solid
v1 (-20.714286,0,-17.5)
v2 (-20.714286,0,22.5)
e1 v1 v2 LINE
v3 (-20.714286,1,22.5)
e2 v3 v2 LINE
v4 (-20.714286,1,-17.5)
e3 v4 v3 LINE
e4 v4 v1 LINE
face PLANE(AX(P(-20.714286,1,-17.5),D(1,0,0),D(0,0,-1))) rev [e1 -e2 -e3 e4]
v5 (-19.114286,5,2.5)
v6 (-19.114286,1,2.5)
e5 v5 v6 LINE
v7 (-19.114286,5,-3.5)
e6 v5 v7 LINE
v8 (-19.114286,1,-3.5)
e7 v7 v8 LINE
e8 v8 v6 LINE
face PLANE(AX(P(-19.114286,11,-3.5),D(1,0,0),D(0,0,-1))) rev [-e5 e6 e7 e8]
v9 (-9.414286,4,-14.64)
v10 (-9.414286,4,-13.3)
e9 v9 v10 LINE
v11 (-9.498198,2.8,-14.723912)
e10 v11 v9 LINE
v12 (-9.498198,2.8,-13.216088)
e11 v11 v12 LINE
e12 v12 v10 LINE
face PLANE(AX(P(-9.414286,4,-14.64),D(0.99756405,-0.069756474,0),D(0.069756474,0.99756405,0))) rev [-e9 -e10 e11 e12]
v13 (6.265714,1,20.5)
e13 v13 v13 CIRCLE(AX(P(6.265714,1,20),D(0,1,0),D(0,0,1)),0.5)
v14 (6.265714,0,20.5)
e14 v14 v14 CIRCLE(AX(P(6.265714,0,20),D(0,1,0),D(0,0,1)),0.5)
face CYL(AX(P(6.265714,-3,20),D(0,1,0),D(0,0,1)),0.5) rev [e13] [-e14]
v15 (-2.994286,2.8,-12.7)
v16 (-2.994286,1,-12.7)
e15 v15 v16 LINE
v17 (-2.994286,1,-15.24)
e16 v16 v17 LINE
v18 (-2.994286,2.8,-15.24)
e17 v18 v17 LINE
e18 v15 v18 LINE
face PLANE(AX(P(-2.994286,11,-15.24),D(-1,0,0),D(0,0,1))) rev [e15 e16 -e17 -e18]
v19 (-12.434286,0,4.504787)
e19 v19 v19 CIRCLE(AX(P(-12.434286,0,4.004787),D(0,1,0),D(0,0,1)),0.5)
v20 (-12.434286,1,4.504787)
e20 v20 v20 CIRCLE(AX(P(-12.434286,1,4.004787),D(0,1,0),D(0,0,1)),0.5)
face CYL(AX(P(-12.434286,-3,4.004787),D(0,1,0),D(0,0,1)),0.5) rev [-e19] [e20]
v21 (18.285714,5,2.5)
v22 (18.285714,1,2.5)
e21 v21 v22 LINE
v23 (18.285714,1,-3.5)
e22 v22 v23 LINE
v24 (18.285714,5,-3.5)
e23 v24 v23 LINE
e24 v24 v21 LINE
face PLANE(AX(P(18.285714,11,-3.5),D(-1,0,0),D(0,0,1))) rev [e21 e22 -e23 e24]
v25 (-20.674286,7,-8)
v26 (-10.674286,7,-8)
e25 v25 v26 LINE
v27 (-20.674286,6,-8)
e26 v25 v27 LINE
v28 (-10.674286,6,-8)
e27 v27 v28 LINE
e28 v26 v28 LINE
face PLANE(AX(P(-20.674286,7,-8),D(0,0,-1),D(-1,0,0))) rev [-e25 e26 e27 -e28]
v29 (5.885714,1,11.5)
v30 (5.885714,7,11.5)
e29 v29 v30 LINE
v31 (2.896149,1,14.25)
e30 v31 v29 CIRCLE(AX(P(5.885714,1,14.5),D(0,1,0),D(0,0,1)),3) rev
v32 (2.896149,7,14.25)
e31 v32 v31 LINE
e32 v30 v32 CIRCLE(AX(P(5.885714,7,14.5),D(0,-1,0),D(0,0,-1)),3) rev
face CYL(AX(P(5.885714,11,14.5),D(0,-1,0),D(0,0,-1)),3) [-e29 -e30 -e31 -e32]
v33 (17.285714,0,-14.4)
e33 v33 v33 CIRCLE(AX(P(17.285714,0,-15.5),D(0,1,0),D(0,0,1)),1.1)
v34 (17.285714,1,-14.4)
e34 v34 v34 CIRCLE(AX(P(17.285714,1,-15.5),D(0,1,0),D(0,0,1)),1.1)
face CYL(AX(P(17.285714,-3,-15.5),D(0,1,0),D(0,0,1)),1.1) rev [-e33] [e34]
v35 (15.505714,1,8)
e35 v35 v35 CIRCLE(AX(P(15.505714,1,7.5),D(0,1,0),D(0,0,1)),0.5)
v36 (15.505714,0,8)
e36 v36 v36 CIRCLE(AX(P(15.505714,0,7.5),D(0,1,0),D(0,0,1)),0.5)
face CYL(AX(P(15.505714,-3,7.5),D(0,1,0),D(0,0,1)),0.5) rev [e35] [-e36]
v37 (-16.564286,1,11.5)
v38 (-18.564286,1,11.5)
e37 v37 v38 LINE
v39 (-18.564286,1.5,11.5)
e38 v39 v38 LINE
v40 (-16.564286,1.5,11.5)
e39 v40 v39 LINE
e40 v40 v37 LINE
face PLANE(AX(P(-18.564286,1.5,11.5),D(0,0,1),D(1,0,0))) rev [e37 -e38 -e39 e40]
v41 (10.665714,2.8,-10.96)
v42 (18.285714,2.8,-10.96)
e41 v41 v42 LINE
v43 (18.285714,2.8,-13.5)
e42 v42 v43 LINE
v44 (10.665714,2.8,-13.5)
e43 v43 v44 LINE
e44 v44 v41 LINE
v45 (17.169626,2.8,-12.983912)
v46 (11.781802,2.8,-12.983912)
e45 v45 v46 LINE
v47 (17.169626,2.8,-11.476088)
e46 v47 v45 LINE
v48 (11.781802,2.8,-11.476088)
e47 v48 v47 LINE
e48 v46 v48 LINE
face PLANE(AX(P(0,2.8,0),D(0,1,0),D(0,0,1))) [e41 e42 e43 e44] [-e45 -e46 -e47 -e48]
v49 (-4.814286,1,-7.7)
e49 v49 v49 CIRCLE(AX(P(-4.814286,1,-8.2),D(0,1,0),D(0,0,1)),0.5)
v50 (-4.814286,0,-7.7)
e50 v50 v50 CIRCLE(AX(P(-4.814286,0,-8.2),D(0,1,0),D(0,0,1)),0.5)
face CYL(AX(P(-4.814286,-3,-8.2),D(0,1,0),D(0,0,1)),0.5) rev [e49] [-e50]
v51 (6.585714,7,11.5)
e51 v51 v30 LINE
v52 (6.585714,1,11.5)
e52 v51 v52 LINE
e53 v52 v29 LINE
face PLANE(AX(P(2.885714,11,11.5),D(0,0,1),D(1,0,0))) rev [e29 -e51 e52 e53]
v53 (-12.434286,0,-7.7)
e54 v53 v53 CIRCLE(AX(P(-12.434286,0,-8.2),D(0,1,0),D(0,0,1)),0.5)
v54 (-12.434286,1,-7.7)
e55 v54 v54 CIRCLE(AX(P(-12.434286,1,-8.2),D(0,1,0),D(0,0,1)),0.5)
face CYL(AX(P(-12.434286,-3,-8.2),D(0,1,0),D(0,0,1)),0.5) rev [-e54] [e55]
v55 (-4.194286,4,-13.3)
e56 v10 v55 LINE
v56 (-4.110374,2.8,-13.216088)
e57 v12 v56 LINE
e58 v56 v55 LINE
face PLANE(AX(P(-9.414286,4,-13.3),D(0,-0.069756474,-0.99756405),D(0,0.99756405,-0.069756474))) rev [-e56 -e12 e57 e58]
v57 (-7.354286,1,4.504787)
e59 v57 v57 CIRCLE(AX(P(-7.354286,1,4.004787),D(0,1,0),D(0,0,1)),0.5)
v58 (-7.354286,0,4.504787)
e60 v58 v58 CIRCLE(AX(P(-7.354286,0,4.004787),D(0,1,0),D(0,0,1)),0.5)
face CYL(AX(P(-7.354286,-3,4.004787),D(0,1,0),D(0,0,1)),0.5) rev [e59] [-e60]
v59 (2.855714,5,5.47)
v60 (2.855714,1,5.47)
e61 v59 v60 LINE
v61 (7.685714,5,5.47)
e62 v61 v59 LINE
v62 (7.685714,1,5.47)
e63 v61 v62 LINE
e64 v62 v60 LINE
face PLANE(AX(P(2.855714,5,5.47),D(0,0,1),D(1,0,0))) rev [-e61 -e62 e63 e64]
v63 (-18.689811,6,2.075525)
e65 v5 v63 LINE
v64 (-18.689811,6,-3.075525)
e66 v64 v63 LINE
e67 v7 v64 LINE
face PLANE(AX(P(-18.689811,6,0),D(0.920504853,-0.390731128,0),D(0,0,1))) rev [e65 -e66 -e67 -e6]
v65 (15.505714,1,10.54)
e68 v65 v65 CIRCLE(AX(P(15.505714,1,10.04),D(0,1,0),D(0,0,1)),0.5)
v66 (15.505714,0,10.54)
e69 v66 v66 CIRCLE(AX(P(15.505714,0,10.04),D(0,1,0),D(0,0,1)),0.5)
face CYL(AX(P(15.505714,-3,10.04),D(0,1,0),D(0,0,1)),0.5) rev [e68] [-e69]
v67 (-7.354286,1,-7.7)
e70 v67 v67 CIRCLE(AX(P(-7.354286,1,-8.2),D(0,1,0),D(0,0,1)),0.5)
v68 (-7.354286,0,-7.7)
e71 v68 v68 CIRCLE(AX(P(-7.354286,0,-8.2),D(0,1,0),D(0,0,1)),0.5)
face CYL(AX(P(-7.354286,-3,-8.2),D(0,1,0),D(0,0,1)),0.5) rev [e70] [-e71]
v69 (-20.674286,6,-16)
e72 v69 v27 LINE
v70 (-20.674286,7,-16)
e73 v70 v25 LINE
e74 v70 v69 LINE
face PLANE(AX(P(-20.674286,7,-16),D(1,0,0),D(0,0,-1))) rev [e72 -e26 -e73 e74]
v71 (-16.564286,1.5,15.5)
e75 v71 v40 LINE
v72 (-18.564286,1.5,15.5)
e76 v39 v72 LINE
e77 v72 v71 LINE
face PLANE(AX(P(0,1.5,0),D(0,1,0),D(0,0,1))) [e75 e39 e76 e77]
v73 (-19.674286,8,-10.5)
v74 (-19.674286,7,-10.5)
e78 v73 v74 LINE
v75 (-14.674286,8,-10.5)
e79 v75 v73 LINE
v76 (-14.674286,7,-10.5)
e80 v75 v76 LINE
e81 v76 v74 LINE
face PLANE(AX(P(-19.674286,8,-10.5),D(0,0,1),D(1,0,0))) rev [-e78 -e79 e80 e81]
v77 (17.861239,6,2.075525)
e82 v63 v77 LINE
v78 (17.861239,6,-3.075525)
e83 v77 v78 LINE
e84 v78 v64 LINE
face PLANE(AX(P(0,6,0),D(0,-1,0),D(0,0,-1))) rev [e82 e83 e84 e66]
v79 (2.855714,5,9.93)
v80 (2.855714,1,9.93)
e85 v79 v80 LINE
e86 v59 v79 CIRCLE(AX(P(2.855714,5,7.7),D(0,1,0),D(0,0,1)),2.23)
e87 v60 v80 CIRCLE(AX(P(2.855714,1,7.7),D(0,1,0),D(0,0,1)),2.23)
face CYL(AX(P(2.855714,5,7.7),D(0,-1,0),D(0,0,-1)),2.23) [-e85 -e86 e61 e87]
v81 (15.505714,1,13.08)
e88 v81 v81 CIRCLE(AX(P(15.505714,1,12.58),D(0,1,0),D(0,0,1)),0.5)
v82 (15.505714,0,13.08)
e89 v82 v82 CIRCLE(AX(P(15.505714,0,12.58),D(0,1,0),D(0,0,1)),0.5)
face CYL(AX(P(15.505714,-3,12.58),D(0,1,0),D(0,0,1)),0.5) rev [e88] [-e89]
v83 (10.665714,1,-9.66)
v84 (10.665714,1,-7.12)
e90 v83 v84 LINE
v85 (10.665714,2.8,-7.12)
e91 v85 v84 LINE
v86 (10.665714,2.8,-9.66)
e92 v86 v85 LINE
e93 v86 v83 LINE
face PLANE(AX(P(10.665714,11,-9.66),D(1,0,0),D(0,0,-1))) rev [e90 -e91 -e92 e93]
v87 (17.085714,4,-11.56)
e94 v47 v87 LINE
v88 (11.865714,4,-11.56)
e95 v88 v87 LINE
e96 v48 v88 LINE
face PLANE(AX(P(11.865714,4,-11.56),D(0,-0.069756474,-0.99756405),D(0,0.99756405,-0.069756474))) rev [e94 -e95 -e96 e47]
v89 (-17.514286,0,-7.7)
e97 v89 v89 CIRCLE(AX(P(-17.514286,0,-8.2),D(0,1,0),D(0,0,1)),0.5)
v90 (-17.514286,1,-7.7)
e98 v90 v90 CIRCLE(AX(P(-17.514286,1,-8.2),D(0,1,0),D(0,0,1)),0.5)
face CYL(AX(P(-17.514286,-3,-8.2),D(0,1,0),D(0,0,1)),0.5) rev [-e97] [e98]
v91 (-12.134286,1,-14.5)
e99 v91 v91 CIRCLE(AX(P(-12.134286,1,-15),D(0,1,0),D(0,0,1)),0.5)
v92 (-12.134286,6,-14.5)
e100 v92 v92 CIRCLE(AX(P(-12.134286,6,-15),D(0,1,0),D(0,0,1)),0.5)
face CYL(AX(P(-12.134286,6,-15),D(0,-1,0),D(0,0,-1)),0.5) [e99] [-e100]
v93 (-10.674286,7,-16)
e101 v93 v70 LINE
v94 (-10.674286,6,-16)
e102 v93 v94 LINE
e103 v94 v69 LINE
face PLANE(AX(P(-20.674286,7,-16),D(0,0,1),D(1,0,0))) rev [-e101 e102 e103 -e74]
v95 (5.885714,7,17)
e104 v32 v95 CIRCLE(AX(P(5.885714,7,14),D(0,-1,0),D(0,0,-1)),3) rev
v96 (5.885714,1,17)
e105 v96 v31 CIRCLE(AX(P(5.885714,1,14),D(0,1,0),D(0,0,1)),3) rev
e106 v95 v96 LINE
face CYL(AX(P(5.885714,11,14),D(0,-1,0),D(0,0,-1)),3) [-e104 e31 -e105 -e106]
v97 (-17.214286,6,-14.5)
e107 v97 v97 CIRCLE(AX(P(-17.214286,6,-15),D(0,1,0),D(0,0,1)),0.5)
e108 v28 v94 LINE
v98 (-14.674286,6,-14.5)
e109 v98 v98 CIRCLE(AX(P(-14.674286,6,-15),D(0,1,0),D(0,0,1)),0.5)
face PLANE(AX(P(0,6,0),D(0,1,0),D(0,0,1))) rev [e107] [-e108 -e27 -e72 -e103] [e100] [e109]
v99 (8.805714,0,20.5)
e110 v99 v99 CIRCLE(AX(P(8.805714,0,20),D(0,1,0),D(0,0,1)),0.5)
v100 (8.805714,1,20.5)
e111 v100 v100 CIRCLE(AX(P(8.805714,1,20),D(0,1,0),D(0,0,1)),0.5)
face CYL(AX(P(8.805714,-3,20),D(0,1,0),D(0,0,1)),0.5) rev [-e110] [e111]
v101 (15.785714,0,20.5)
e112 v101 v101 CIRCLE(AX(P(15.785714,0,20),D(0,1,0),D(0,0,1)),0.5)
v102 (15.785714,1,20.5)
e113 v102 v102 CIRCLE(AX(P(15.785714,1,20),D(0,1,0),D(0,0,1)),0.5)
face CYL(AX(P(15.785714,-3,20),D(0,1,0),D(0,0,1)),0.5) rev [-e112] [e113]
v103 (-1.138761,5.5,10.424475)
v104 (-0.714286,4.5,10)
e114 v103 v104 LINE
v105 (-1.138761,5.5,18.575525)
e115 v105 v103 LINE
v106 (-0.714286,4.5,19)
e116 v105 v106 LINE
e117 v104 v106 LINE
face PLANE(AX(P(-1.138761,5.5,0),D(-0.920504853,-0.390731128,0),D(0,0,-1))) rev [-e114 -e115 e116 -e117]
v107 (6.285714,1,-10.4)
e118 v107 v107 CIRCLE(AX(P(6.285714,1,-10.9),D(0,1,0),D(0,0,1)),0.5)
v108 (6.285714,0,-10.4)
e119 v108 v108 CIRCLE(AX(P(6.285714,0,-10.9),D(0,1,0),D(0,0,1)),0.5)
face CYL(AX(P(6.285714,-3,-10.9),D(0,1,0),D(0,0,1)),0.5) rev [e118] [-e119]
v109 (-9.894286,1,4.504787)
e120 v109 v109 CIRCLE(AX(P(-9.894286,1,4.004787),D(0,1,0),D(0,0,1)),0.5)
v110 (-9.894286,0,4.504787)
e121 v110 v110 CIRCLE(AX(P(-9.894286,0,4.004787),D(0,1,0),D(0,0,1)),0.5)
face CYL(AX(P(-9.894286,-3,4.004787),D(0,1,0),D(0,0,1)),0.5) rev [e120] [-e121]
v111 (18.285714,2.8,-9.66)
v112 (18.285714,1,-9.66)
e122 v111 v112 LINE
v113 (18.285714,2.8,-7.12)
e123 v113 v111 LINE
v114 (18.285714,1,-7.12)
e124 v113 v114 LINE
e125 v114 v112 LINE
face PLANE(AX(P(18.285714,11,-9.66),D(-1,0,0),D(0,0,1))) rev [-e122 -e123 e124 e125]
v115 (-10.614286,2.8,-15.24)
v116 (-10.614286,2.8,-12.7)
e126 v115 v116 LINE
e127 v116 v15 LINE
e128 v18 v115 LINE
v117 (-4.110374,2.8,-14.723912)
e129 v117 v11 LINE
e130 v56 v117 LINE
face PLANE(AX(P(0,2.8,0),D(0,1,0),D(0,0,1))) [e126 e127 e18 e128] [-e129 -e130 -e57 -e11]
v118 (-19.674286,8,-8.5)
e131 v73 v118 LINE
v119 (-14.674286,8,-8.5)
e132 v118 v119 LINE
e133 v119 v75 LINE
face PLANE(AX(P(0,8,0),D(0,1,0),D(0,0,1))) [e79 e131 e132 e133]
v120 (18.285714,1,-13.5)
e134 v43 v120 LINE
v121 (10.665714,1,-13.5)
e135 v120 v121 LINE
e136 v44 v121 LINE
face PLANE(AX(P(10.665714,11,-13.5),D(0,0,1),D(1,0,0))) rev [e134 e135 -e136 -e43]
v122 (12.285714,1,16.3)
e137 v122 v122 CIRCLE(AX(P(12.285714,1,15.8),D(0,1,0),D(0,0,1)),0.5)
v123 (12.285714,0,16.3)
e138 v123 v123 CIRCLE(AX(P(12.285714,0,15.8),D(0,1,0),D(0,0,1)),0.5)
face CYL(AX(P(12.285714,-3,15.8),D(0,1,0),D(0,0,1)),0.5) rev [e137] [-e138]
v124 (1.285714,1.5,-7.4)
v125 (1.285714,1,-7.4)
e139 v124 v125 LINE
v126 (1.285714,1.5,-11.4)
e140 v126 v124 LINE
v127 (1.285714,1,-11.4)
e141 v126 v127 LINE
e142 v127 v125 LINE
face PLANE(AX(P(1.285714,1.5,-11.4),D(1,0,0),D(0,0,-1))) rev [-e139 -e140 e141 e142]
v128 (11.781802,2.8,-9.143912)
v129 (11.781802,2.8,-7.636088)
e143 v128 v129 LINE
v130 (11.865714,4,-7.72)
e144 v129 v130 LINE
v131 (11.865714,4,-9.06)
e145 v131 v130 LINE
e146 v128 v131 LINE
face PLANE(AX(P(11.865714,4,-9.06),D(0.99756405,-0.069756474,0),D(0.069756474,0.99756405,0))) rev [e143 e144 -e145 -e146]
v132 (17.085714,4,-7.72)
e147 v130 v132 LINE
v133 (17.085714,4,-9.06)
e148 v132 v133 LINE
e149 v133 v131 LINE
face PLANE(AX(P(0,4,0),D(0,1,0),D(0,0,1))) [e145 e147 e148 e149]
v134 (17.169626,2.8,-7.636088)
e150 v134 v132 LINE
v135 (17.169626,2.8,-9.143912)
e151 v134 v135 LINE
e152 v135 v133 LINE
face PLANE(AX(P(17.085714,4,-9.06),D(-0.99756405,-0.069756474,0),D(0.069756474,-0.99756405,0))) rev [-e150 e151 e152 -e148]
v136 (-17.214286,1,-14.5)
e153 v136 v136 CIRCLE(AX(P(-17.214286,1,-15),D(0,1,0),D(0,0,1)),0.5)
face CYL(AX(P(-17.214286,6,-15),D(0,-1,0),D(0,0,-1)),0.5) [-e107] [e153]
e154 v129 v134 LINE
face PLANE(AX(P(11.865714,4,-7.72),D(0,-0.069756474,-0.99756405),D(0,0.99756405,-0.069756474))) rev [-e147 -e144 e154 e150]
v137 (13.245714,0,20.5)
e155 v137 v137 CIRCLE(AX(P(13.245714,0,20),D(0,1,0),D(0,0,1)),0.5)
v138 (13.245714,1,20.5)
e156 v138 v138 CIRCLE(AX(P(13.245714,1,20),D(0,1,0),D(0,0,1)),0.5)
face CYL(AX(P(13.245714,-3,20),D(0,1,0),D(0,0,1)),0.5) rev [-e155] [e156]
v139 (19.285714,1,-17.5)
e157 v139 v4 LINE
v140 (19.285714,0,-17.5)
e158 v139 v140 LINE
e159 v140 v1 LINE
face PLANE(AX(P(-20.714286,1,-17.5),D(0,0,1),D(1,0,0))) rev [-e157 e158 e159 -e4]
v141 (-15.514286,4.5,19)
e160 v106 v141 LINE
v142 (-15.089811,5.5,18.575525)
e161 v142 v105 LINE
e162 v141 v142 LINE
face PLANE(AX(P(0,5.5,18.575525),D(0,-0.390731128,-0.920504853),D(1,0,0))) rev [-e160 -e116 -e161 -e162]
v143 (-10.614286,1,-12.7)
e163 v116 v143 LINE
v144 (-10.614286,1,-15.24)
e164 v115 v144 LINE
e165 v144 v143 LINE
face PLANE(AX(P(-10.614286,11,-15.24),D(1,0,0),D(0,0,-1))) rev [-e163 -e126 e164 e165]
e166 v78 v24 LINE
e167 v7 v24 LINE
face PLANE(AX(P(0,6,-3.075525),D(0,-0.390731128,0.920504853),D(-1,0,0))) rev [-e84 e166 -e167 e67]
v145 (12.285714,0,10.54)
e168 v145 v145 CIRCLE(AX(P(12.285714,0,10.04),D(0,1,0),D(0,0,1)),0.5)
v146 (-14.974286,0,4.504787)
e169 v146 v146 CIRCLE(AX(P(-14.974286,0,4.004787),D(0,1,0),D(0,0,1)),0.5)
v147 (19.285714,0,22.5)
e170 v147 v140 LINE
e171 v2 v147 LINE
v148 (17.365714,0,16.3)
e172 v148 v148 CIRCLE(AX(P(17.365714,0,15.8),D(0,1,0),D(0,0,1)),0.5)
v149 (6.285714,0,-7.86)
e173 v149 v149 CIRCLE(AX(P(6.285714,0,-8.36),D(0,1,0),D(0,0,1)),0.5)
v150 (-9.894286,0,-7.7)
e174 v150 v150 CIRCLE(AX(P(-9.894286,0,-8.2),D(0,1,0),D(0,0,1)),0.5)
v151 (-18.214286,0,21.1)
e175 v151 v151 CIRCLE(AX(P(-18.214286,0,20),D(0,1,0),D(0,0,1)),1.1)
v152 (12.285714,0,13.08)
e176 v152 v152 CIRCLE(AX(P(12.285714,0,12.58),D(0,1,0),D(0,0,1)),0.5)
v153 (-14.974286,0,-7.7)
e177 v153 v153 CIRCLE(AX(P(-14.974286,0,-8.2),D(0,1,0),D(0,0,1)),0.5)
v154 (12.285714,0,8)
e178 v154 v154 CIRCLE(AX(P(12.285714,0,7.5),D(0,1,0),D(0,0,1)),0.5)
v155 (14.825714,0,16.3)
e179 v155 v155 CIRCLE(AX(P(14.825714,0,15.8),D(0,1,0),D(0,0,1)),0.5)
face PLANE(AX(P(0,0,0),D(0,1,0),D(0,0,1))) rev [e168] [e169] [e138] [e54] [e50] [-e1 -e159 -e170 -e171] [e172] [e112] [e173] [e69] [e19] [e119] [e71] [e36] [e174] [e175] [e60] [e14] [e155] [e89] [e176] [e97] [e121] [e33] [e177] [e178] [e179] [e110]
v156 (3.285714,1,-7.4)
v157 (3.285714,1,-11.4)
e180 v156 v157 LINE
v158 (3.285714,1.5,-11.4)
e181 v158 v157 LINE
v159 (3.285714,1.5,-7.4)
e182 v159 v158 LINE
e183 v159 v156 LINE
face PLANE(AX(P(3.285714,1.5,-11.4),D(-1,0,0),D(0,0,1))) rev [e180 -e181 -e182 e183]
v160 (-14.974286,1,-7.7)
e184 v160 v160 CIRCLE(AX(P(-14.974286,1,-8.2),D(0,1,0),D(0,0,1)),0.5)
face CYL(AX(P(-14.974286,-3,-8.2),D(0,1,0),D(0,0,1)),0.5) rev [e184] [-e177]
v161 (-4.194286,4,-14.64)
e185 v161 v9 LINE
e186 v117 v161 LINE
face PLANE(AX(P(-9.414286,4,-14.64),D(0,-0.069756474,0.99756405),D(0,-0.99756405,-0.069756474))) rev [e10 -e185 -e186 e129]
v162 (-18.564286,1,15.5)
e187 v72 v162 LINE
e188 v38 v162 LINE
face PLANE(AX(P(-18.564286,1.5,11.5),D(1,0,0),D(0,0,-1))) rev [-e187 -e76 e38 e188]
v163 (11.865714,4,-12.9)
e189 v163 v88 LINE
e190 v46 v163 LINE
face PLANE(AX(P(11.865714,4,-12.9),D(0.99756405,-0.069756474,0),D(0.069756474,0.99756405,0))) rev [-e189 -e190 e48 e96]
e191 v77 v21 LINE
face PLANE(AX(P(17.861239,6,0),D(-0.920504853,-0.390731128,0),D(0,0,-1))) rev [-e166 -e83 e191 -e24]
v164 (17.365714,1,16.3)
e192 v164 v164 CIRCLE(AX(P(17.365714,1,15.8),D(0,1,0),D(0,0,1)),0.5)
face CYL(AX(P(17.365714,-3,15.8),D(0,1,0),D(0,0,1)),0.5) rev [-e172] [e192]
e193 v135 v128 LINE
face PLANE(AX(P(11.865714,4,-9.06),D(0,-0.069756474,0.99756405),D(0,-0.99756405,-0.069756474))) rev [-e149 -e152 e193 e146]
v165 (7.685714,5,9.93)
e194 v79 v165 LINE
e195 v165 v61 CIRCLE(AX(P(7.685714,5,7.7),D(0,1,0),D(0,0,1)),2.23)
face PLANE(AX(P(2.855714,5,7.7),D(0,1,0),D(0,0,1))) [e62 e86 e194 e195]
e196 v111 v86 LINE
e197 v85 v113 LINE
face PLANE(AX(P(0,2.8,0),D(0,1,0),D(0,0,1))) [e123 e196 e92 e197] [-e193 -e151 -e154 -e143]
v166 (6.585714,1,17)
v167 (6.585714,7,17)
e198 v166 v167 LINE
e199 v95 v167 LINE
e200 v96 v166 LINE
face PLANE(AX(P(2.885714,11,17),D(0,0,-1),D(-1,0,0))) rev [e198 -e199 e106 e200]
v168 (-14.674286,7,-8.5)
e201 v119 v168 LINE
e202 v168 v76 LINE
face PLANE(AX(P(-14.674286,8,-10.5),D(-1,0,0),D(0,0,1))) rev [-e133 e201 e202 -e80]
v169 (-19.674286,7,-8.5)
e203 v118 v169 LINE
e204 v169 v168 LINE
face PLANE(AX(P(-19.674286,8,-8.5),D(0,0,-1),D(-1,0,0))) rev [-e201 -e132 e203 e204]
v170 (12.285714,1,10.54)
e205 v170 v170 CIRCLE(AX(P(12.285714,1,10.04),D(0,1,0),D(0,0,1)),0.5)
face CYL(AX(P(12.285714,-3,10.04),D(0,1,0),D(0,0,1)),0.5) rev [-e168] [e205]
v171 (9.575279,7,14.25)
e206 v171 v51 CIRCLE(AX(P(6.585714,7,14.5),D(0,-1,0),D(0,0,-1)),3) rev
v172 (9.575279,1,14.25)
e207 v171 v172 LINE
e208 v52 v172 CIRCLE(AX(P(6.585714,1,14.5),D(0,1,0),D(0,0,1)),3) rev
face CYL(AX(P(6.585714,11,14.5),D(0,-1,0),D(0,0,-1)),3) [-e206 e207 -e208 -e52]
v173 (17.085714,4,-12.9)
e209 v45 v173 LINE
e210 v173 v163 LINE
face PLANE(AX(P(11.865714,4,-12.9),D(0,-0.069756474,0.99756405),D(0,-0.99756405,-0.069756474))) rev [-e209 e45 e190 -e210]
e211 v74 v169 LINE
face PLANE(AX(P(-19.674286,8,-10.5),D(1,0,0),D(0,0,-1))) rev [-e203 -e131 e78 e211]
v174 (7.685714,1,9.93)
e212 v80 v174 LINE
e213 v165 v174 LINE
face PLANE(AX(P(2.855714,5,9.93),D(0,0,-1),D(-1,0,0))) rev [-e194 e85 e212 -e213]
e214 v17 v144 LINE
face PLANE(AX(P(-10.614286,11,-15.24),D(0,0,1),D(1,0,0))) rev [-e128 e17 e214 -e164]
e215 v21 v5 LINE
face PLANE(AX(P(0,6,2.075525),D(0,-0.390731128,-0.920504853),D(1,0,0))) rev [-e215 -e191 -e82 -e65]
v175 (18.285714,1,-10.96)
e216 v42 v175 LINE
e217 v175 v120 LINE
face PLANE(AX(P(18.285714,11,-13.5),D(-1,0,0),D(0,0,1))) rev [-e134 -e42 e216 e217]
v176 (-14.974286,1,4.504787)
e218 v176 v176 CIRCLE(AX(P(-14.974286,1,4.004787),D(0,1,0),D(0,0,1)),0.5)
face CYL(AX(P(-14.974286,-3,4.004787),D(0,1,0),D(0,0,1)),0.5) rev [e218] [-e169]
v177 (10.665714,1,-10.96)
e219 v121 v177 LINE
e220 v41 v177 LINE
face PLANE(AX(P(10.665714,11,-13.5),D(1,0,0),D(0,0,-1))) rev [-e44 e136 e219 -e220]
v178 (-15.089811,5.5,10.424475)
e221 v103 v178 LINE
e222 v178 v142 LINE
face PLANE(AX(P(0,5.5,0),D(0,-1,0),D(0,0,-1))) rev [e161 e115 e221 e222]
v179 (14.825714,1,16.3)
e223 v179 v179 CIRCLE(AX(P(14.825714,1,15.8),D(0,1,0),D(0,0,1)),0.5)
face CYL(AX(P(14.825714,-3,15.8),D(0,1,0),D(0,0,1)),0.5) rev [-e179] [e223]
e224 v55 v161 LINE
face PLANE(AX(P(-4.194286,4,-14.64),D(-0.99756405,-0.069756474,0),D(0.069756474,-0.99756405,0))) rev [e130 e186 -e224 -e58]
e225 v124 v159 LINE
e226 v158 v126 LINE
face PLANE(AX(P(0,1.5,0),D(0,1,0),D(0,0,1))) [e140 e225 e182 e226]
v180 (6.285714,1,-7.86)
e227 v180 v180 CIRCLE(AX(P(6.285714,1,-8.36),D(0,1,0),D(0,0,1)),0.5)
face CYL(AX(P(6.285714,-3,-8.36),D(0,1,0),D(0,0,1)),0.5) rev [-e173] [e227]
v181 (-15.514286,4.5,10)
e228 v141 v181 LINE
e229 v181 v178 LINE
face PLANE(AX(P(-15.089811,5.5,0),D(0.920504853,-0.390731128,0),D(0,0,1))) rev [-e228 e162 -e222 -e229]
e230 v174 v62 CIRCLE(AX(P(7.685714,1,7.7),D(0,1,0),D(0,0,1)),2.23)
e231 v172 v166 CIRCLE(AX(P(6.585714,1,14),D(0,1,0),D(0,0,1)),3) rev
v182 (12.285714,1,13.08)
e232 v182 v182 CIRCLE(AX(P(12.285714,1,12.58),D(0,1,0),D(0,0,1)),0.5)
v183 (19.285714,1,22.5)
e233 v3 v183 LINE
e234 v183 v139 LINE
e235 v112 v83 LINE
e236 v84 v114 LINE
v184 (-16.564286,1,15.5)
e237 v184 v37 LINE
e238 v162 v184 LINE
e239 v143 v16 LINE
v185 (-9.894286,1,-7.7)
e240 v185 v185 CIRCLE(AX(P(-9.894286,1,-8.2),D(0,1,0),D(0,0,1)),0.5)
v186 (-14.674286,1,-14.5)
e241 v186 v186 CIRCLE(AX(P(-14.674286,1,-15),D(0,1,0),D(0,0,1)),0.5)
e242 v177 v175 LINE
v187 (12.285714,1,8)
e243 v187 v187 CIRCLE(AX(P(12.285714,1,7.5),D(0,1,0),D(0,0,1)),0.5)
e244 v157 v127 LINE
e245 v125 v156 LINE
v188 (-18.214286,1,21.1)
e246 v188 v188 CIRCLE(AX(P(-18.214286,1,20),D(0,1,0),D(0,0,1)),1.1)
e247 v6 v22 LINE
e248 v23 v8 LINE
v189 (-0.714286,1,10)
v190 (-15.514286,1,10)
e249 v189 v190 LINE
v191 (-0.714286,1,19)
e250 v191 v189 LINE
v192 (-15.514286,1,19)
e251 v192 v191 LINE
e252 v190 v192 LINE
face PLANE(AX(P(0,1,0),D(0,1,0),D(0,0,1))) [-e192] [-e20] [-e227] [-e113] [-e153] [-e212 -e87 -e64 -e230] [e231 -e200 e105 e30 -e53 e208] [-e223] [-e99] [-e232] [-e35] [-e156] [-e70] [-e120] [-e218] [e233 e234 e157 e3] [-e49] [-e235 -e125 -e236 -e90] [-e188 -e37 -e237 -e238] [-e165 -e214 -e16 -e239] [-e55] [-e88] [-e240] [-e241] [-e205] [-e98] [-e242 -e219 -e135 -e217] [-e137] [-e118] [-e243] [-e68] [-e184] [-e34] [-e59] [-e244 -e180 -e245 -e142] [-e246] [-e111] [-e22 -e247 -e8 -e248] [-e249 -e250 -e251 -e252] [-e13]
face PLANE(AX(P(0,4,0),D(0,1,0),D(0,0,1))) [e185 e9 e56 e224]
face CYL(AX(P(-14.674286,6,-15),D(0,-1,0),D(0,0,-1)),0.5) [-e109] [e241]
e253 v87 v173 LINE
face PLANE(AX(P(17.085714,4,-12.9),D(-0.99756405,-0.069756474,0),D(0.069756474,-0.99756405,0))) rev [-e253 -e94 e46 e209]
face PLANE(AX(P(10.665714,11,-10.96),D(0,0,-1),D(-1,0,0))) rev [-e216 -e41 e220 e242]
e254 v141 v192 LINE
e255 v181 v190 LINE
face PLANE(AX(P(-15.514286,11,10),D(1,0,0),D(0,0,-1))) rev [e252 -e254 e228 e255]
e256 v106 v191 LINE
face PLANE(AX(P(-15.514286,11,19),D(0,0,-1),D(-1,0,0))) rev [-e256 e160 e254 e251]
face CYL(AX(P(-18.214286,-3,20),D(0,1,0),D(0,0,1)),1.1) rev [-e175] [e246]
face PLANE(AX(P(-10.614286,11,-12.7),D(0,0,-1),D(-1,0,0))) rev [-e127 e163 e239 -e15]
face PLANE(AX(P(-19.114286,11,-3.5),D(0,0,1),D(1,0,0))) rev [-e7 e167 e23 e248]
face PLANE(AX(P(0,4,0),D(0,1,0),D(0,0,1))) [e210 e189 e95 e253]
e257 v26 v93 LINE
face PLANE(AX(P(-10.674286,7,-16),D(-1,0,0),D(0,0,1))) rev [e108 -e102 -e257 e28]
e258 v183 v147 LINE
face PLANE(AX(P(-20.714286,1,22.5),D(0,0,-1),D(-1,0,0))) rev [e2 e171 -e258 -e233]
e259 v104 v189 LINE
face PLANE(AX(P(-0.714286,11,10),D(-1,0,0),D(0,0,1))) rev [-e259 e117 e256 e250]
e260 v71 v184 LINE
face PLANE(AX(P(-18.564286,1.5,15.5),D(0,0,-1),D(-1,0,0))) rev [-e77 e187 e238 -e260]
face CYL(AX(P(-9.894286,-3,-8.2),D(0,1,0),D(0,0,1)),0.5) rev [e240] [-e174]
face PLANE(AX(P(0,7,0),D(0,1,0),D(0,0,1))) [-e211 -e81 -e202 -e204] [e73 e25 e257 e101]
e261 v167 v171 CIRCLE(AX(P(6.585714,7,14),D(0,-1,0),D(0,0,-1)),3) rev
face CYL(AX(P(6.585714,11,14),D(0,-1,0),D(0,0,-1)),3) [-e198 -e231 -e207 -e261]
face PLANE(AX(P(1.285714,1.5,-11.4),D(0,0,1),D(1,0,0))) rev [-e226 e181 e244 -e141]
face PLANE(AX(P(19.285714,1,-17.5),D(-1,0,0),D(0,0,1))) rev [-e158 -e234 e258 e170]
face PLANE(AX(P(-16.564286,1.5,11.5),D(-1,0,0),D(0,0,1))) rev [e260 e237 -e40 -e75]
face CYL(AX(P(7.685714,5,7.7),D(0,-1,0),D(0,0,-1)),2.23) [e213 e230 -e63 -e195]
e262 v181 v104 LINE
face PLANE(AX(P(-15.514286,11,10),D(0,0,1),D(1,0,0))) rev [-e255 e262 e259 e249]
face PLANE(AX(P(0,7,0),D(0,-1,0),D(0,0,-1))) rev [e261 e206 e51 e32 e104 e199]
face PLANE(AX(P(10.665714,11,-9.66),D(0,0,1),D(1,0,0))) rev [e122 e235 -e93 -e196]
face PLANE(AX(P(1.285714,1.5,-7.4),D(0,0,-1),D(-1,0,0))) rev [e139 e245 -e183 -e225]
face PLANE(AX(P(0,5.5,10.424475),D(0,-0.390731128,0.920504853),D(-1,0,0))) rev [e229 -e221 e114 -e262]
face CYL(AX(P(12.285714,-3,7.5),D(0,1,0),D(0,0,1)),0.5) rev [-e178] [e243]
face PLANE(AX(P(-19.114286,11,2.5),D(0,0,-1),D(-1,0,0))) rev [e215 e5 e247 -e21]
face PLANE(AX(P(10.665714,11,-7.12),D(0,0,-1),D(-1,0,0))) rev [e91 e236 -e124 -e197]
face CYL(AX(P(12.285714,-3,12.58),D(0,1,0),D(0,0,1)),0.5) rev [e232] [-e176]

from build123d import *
from OCP.BRepFilletAPI import BRepFilletAPI_MakeChamfer

# Parameters (mm, degrees)
SKETCH1_W                    = 40
SKETCH1_H                    = 40
BOSS_EXTRUDE1_DEPTH          = 1
SKETCH2_W                    = 37.4
SKETCH2_H                    = 6
SKETCH2_W_2                  = 14.8
SKETCH2_H_2                  = 9
SKETCH2_W_3                  = 7.62
SKETCH2_H_3                  = 2.54
SKETCH2_W_4                  = 6.7
SKETCH2_H_4                  = 5.5
BOSS_EXTRUDE2_DEPTH          = 10
SKETCH3_W                    = 44.444208302
SKETCH3_H                    = 24.405132015
CUT_EXTRUDE1_DEPTH           = 5
SKETCH4_W                    = 37.986083978
SKETCH4_H                    = 13.538017351
CUT_EXTRUDE2_DEPTH           = 2
SKETCH5_W                    = 7.62
SKETCH5_H                    = 2.54
SKETCH5_W_2                  = 5.22
SKETCH5_H_2                  = 1.34
CUT_EXTRUDE3_DEPTH           = 1.2
CUT_EXTRUDE3_DRAFT           = -4
CUT_EXTRUDE3_PROFILE_2_DEPTH = 1.2
CUT_EXTRUDE3_PROFILE_2_DRAFT = -4
CUT_EXTRUDE3_PROFILE_3_DEPTH = 1.2
CUT_EXTRUDE3_PROFILE_3_DRAFT = -4
SKETCH6_W                    = 43.509309309
SKETCH6_H                    = 14.65684545
SKETCH6_W_2                  = 6.282444341
SKETCH6_H_2                  = 1.811548849
SKETCH6_W_3                  = 6.146239586
SKETCH6_H_3                  = 1.957943358
CUT_EXTRUDE4_DEPTH           = 1.2
SKETCH7_W                    = 37.4
SKETCH7_H                    = 6
CUT_EXTRUDE5_DEPTH           = 5
CHAMFER1_SIZE                = 1
CHAMFER1_SIZE2               = 0.424474816
SKETCH8_W                    = 14.8
SKETCH8_H                    = 9
CUT_EXTRUDE6_DEPTH           = 5.5
CHAMFER2_SIZE                = 1
CHAMFER2_SIZE2               = 0.424474816
SKETCH9_W                    = 6.7
SKETCH9_H                    = 5.5
CUT_EXTRUDE7_DEPTH           = 4
FILLET1_R                    = 3
SKETCH10_R                   = 1.1
CUT_EXTRUDE8_DEPTH           = 4
SKETCH11_R                   = 0.5
CUT_EXTRUDE10_DEPTH          = 4
SKETCH12_R                   = 0.5
BOSS_EXTRUDE3_DEPTH          = 5
SKETCH13_W                   = 10
SKETCH13_H                   = 8
BOSS_EXTRUDE4_DEPTH          = 1
SKETCH14_W                   = 5
SKETCH14_H                   = 2
BOSS_EXTRUDE5_DEPTH          = 1
BOSS_EXTRUDE6_DEPTH          = 4
SKETCH16_W                   = 2
SKETCH16_H                   = 4
BOSS_EXTRUDE7_DEPTH          = 0.5


with BuildPart() as part:
    # Sketch1 → Boss-Extrude1 (new body)
    with BuildSketch(Plane(origin=(0, 0, 0), x_dir=(1, 0, 0), z_dir=(0, 1, 0))):
        with Locations((-0.714285714, -2.5)):
            Rectangle(SKETCH1_W, SKETCH1_H)
    extrude(amount=BOSS_EXTRUDE1_DEPTH)

    # Sketch2 → Boss-Extrude2 (add)
    with BuildSketch(Plane(origin=(0, 1, 0), x_dir=(1, 0, 0), z_dir=(0, 1, 0))):
        with Locations((-0.414285714, 0.5)):
            Rectangle(SKETCH2_W, SKETCH2_H)
        with Locations((-8.114285714, -14.5)):
            Rectangle(SKETCH2_W_2, SKETCH2_H_2)
        with Locations((-6.804285714, 13.97)):
            Rectangle(SKETCH2_W_3, SKETCH2_H_3)
        with Locations((14.475714286, 12.23)):
            Rectangle(SKETCH2_W_3, SKETCH2_H_3)
        with Locations((14.475714286, 8.39)):
            Rectangle(SKETCH2_W_3, SKETCH2_H_3)
        with Locations((6.235714286, -14.25)):
            Rectangle(SKETCH2_W_4, SKETCH2_H_4)
    extrude(amount=BOSS_EXTRUDE2_DEPTH)

    # Sketch3 → Cut-Extrude1 (cut)
    with BuildSketch(Plane(origin=(0, 11, 0), x_dir=(1, 0, 0), z_dir=(0, 1, 0))):
        with Locations((0.671142181, 17.607012743)):
            Rectangle(SKETCH3_W, SKETCH3_H)
    extrude(amount=-CUT_EXTRUDE1_DEPTH, mode=Mode.SUBTRACT)

    # Sketch4 → Cut-Extrude2 (cut)
    with BuildSketch(Plane(origin=(0, 6, 0), x_dir=(1, 0, 0), z_dir=(0, 1, 0))):
        with Locations((1.316416888, 12.272365991)):
            Rectangle(SKETCH4_W, SKETCH4_H)
    extrude(amount=-CUT_EXTRUDE2_DEPTH, mode=Mode.SUBTRACT)


with BuildPart() as cut_extrude3_tool:
    # Sketch5 → Cut-Extrude3 (with draft: the straight prism first)
    with BuildSketch(Plane(origin=(0, 4, 0), x_dir=(1, 0, 0), z_dir=(0, 1, 0))):
        with Locations((-6.804285714, 13.97)):
            Rectangle(SKETCH5_W, SKETCH5_H)
        with Locations((-6.804285714, 13.97)):
            Rectangle(SKETCH5_W_2, SKETCH5_H_2, mode=Mode.SUBTRACT)
    extrude(amount=-CUT_EXTRUDE3_DEPTH)
    # Cut-Extrude3: the draft: its side faces are tilted about the plane it starts from
    cut_extrude3_sides = [cut_extrude3_tool.faces().sort_by_distance(p)[0] for p in [
        (-10.614285714, 3.4, -13.97),
        (-6.804285714, 3.4, -12.7),
        (-2.994285714, 3.4, -13.97),
        (-6.804285714, 3.4, -15.24),
        (-6.804285714, 3.4, -14.64),
        (-4.194285714, 3.4, -13.97),
        (-6.804285714, 3.4, -13.3),
        (-9.414285714, 3.4, -13.97),
    ]]
    draft(cut_extrude3_sides, Plane(origin=(0, 4, 0), x_dir=(1, 0, 0), z_dir=(0, 1, 0)), CUT_EXTRUDE3_DRAFT)


with BuildPart() as part_1:
    add(part.part)

    # Cut-Extrude3: cut by cut_extrude3_tool
    add(cut_extrude3_tool.part, mode=Mode.SUBTRACT)


with BuildPart() as cut_extrude3_profile_2_tool:
    # Sketch5 → Cut-Extrude3 profile 2 (with draft: the straight prism first)
    with BuildSketch(Plane(origin=(0, 4, 0), x_dir=(1, 0, 0), z_dir=(0, 1, 0))):
        with Locations((14.475714286, 12.23)):
            Rectangle(SKETCH5_W, SKETCH5_H)
        with Locations((14.475714286, 12.23)):
            Rectangle(SKETCH5_W_2, SKETCH5_H_2, mode=Mode.SUBTRACT)
    extrude(amount=-CUT_EXTRUDE3_PROFILE_2_DEPTH)
    # Cut-Extrude3 profile 2: the draft: its side faces are tilted about the plane it starts from
    cut_extrude3_profile_2_sides = [cut_extrude3_profile_2_tool.faces().sort_by_distance(p)[0] for p in [
        (10.665714286, 3.4, -12.23),
        (14.475714286, 3.4, -10.96),
        (18.285714286, 3.4, -12.23),
        (14.475714286, 3.4, -13.5),
        (14.475714286, 3.4, -12.9),
        (17.085714286, 3.4, -12.23),
        (14.475714286, 3.4, -11.56),
        (11.865714286, 3.4, -12.23),
    ]]
    draft(cut_extrude3_profile_2_sides, Plane(origin=(0, 4, 0), x_dir=(1, 0, 0), z_dir=(0, 1, 0)), CUT_EXTRUDE3_PROFILE_2_DRAFT)


with BuildPart() as part_2:
    add(part_1.part)

    # Cut-Extrude3 profile 2: cut by cut_extrude3_profile_2_tool
    add(cut_extrude3_profile_2_tool.part, mode=Mode.SUBTRACT)


with BuildPart() as cut_extrude3_profile_3_tool:
    # Sketch5 → Cut-Extrude3 profile 3 (with draft: the straight prism first)
    with BuildSketch(Plane(origin=(0, 4, 0), x_dir=(1, 0, 0), z_dir=(0, 1, 0))):
        with Locations((14.475714286, 8.39)):
            Rectangle(SKETCH5_W, SKETCH5_H)
        with Locations((14.475714286, 8.39)):
            Rectangle(SKETCH5_W_2, SKETCH5_H_2, mode=Mode.SUBTRACT)
    extrude(amount=-CUT_EXTRUDE3_PROFILE_3_DEPTH)
    # Cut-Extrude3 profile 3: the draft: its side faces are tilted about the plane it starts from
    cut_extrude3_profile_3_sides = [cut_extrude3_profile_3_tool.faces().sort_by_distance(p)[0] for p in [
        (10.665714286, 3.4, -8.39),
        (14.475714286, 3.4, -7.12),
        (18.285714286, 3.4, -8.39),
        (14.475714286, 3.4, -9.66),
        (14.475714286, 3.4, -9.06),
        (17.085714286, 3.4, -8.39),
        (14.475714286, 3.4, -7.72),
        (11.865714286, 3.4, -8.39),
    ]]
    draft(cut_extrude3_profile_3_sides, Plane(origin=(0, 4, 0), x_dir=(1, 0, 0), z_dir=(0, 1, 0)), CUT_EXTRUDE3_PROFILE_3_DRAFT)


with BuildPart() as part_3:
    add(part_2.part)

    # Cut-Extrude3 profile 3: cut by cut_extrude3_profile_3_tool
    add(cut_extrude3_profile_3_tool.part, mode=Mode.SUBTRACT)

    # Sketch6 → Cut-Extrude4 (cut)
    with BuildSketch(Plane(origin=(0, 4, 0), x_dir=(1, 0, 0), z_dir=(0, 1, 0))):
        with Locations((1.46415277, 11.874760487)):
            Rectangle(SKETCH6_W, SKETCH6_H)
        Polygon((-10.258568455, 13.117709551), (-10.258568455, 14.988111357), (-3.391887854, 14.988111357), (-3.391887854, 12.963977896), align=None, mode=Mode.SUBTRACT)
        with Locations((14.407855281, 12.211935127)):
            Rectangle(SKETCH6_W_2, SKETCH6_H_2, mode=Mode.SUBTRACT)
        with Locations((14.475957658, 8.403296853)):
            Rectangle(SKETCH6_W_3, SKETCH6_H_3, mode=Mode.SUBTRACT)
    extrude(amount=-CUT_EXTRUDE4_DEPTH, mode=Mode.SUBTRACT)

    # Sketch7 → Cut-Extrude5 (cut)
    with BuildSketch(Plane(origin=(0, 11, 0), x_dir=(1, 0, 0), z_dir=(0, 1, 0))):
        with Locations((-0.414285714, 0.5)):
            Rectangle(SKETCH7_W, SKETCH7_H)
    extrude(amount=-CUT_EXTRUDE5_DEPTH, mode=Mode.SUBTRACT)

    # Chamfer1: one chamfer whose edges measure the first distance from different faces: ONE call of the kernel's chamfer builder (chamfer() names one face for all edges)
    chamfer1_edges_1 = [part_3.edges().sort_by_distance(p)[0] for p in [
        (-19.114285714, 6, -0.5),
    ]]
    chamfer1_side_1 = [part_3.faces().sort_by_distance(p)[0] for p in [
        (-19.114285714, 3.5, -0.5),
    ]]
    chamfer1_edges_2 = [part_3.edges().sort_by_distance(p)[0] for p in [
        (-0.414285714, 6, -3.5),
    ]]
    chamfer1_side_2 = [part_3.faces().sort_by_distance(p)[0] for p in [
        (-0.414285714, 3.5, -3.5),
    ]]
    chamfer1_edges_3 = [part_3.edges().sort_by_distance(p)[0] for p in [
        (18.285714286, 6, -0.5),
    ]]
    chamfer1_side_3 = [part_3.faces().sort_by_distance(p)[0] for p in [
        (18.285714286, 3.5, -0.5),
    ]]
    chamfer1_edges_4 = [part_3.edges().sort_by_distance(p)[0] for p in [
        (-0.414285714, 6, 2.5),
    ]]
    chamfer1_side_4 = [part_3.faces().sort_by_distance(p)[0] for p in [
        (-0.414285714, 3.5, 2.5),
    ]]
    chamfer1 = BRepFilletAPI_MakeChamfer(part_3.part.solid().wrapped)
    for e in chamfer1_edges_1:
        chamfer1.Add(CHAMFER1_SIZE, CHAMFER1_SIZE2, e.wrapped, chamfer1_side_1[0].wrapped)  # the first distance lies on this face
    for e in chamfer1_edges_2:
        chamfer1.Add(CHAMFER1_SIZE, CHAMFER1_SIZE2, e.wrapped, chamfer1_side_2[0].wrapped)  # the first distance lies on this face
    for e in chamfer1_edges_3:
        chamfer1.Add(CHAMFER1_SIZE, CHAMFER1_SIZE2, e.wrapped, chamfer1_side_3[0].wrapped)  # the first distance lies on this face
    for e in chamfer1_edges_4:
        chamfer1.Add(CHAMFER1_SIZE, CHAMFER1_SIZE2, e.wrapped, chamfer1_side_4[0].wrapped)  # the first distance lies on this face
    add(Compound.cast(chamfer1.Shape()), mode=Mode.REPLACE)

    # Sketch8 → Cut-Extrude6 (cut)
    with BuildSketch(Plane(origin=(0, 11, 0), x_dir=(1, 0, 0), z_dir=(0, 1, 0))):
        with Locations((-8.114285714, -14.5)):
            Rectangle(SKETCH8_W, SKETCH8_H)
    extrude(amount=-CUT_EXTRUDE6_DEPTH, mode=Mode.SUBTRACT)

    # Chamfer2: one chamfer whose edges measure the first distance from different faces: ONE call of the kernel's chamfer builder (chamfer() names one face for all edges)
    chamfer2_edges_1 = [part_3.edges().sort_by_distance(p)[0] for p in [
        (-15.514285714, 5.5, 14.5),
    ]]
    chamfer2_side_1 = [part_3.faces().sort_by_distance(p)[0] for p in [
        (-15.514285714, 3.25, 14.5),
    ]]
    chamfer2_edges_2 = [part_3.edges().sort_by_distance(p)[0] for p in [
        (-8.114285714, 5.5, 10),
    ]]
    chamfer2_side_2 = [part_3.faces().sort_by_distance(p)[0] for p in [
        (-8.114285714, 3.25, 10),
    ]]
    chamfer2_edges_3 = [part_3.edges().sort_by_distance(p)[0] for p in [
        (-0.714285714, 5.5, 14.5),
    ]]
    chamfer2_side_3 = [part_3.faces().sort_by_distance(p)[0] for p in [
        (-0.714285714, 3.25, 14.5),
    ]]
    chamfer2_edges_4 = [part_3.edges().sort_by_distance(p)[0] for p in [
        (-8.114285714, 5.5, 19),
    ]]
    chamfer2_side_4 = [part_3.faces().sort_by_distance(p)[0] for p in [
        (-8.114285714, 3.25, 19),
    ]]
    chamfer2 = BRepFilletAPI_MakeChamfer(part_3.part.solid().wrapped)
    for e in chamfer2_edges_1:
        chamfer2.Add(CHAMFER2_SIZE, CHAMFER2_SIZE2, e.wrapped, chamfer2_side_1[0].wrapped)  # the first distance lies on this face
    for e in chamfer2_edges_2:
        chamfer2.Add(CHAMFER2_SIZE, CHAMFER2_SIZE2, e.wrapped, chamfer2_side_2[0].wrapped)  # the first distance lies on this face
    for e in chamfer2_edges_3:
        chamfer2.Add(CHAMFER2_SIZE, CHAMFER2_SIZE2, e.wrapped, chamfer2_side_3[0].wrapped)  # the first distance lies on this face
    for e in chamfer2_edges_4:
        chamfer2.Add(CHAMFER2_SIZE, CHAMFER2_SIZE2, e.wrapped, chamfer2_side_4[0].wrapped)  # the first distance lies on this face
    add(Compound.cast(chamfer2.Shape()), mode=Mode.REPLACE)

    # Sketch9 → Cut-Extrude7 (cut)
    with BuildSketch(Plane(origin=(0, 11, 0), x_dir=(1, 0, 0), z_dir=(0, 1, 0))):
        with Locations((6.235714286, -14.25)):
            Rectangle(SKETCH9_W, SKETCH9_H)
    extrude(amount=-CUT_EXTRUDE7_DEPTH, mode=Mode.SUBTRACT)

    # Fillet1
    # the kernel refuses this fillet: 3 mm, written as the material it takes off along each edge
    with BuildSketch(Plane(origin=(9.585714286, 1, 11.5), x_dir=(-1, 0, 0), z_dir=(0, 1, 0)), Plane(origin=(9.585714286, 1, 17), x_dir=(0, 0, -1), z_dir=(0, 1, 0)), Plane(origin=(2.885714286, 1, 17), x_dir=(1, 0, 0), z_dir=(0, 1, 0))) as fillet1_piece_1:
        with BuildLine():
            CenterArc((FILLET1_R, FILLET1_R), FILLET1_R, 180, 90)
            Line((0, FILLET1_R), (0, 0))
            Line((0, 0), (FILLET1_R, 0))
        make_face()
    extrude(amount=13.5, mode=Mode.SUBTRACT)
    with BuildSketch(Plane(origin=(2.885714286, 1, 11.5), x_dir=(1, 0, 0), z_dir=(0, 1, 0))) as fillet1_piece_2:
        with BuildLine():
            CenterArc((FILLET1_R, -FILLET1_R), FILLET1_R, 90, 90)
            Line((0, -FILLET1_R), (0, 0))
            Line((0, 0), (FILLET1_R, 0))
        make_face()
    extrude(amount=13.5, mode=Mode.SUBTRACT)

    # Sketch10 → Cut-Extrude8 (cut)
    with BuildSketch(Plane(origin=(0, 1, 0), x_dir=(1, 0, 0), z_dir=(0, 1, 0))):
        with Locations(Location((-18.214285714, -20, 0), (0, 0, 270))):
            Circle(SKETCH10_R)
        with Locations(Location((17.285714286, 15.5, 0), (0, 0, 270))):
            Circle(SKETCH10_R)
    extrude(amount=-CUT_EXTRUDE8_DEPTH, mode=Mode.SUBTRACT)

    # Sketch11 → Cut-Extrude10 (cut)
    with BuildSketch(Plane(origin=(0, 1, 0), x_dir=(1, 0, 0), z_dir=(0, 1, 0))):
        with Locations(Location((-17.514285714, 8.2, 0), (0, 0, 270))):
            Circle(SKETCH11_R)
        with Locations(Location((-14.974285714, 8.2, 0), (0, 0, 270))):
            Circle(SKETCH11_R)
        with Locations(Location((-9.894285714, 8.2, 0), (0, 0, 270))):
            Circle(SKETCH11_R)
        with Locations(Location((-7.354285714, 8.2, 0), (0, 0, 270))):
            Circle(SKETCH11_R)
        with Locations(Location((-4.814285714, 8.2, 0), (0, 0, 270))):
            Circle(SKETCH11_R)
        with Locations(Location((-12.434285714, 8.2, 0), (0, 0, 270))):
            Circle(SKETCH11_R)
        with Locations(Location((-14.974285714, -4.00478655, 0), (0, 0, 270))):
            Circle(SKETCH11_R)
        with Locations(Location((-12.434285714, -4.00478655, 0), (0, 0, 270))):
            Circle(SKETCH11_R)
        with Locations(Location((-9.894285714, -4.00478655, 0), (0, 0, 270))):
            Circle(SKETCH11_R)
        with Locations(Location((-7.354285714, -4.00478655, 0), (0, 0, 270))):
            Circle(SKETCH11_R)
        with Locations(Location((6.285714286, 10.9, 0), (0, 0, 270))):
            Circle(SKETCH11_R)
        with Locations(Location((6.285714286, 8.36, 0), (0, 0, 270))):
            Circle(SKETCH11_R)
        with Locations(Location((12.285714286, -7.5, 0), (0, 0, 270))):
            Circle(SKETCH11_R)
        with Locations(Location((12.285714286, -10.04, 0), (0, 0, 270))):
            Circle(SKETCH11_R)
        with Locations(Location((12.285714286, -12.58, 0), (0, 0, 270))):
            Circle(SKETCH11_R)
        with Locations(Location((15.505714286, -7.5, 0), (0, 0, 270))):
            Circle(SKETCH11_R)
        with Locations(Location((15.505714286, -10.04, 0), (0, 0, 270))):
            Circle(SKETCH11_R)
        with Locations(Location((15.505714286, -12.58, 0), (0, 0, 270))):
            Circle(SKETCH11_R)
        with Locations(Location((12.285714286, -15.8, 0), (0, 0, 270))):
            Circle(SKETCH11_R)
        with Locations(Location((14.825714286, -15.8, 0), (0, 0, 270))):
            Circle(SKETCH11_R)
        with Locations(Location((17.365714286, -15.8, 0), (0, 0, 270))):
            Circle(SKETCH11_R)
        with Locations(Location((15.785714286, -20, 0), (0, 0, 270))):
            Circle(SKETCH11_R)
        with Locations(Location((13.245714286, -20, 0), (0, 0, 270))):
            Circle(SKETCH11_R)
        with Locations(Location((8.805714286, -20, 0), (0, 0, 270))):
            Circle(SKETCH11_R)
        with Locations(Location((6.265714286, -20, 0), (0, 0, 270))):
            Circle(SKETCH11_R)
    extrude(amount=-CUT_EXTRUDE10_DEPTH, mode=Mode.SUBTRACT)

    # Sketch12 → Boss-Extrude3 (add)
    with BuildSketch(Plane(origin=(0, 1, 0), x_dir=(1, 0, 0), z_dir=(0, 1, 0))):
        with Locations(Location((-17.214285714, 15, 0), (0, 0, 270))):
            Circle(SKETCH12_R)
        with Locations(Location((-14.674285714, 15, 0), (0, 0, 270))):
            Circle(SKETCH12_R)
        with Locations(Location((-12.134285714, 15, 0), (0, 0, 270))):
            Circle(SKETCH12_R)
    extrude(amount=BOSS_EXTRUDE3_DEPTH)

    # Sketch13 → Boss-Extrude4 (add)
    with BuildSketch(Plane(origin=(0, 6, 0), x_dir=(1, 0, 0), z_dir=(0, 1, 0))):
        with Locations((-15.674285714, 12)):
            Rectangle(SKETCH13_W, SKETCH13_H)
    extrude(amount=BOSS_EXTRUDE4_DEPTH)

    # Sketch14 → Boss-Extrude5 (add)
    with BuildSketch(Plane(origin=(0, 7, 0), x_dir=(1, 0, 0), z_dir=(0, 1, 0))):
        with Locations((-17.174285714, 9.5)):
            Rectangle(SKETCH14_W, SKETCH14_H)
    extrude(amount=BOSS_EXTRUDE5_DEPTH)

    # Sketch15 → Boss-Extrude6 (add)
    with BuildSketch(Plane(origin=(0, 1, 0), x_dir=(1, 0, 0), z_dir=(0, 1, 0))):
        with BuildLine():
            Line((2.855714286, -5.47), (7.685714286, -5.47))
            ThreePointArc((7.685714286, -5.47), (9.915714286, -7.7), (7.685714286, -9.93))
            Line((7.685714286, -9.93), (2.855714286, -9.93))
            ThreePointArc((2.855714286, -9.93), (0.625714286, -7.7), (2.855714286, -5.47))
        make_face()
    extrude(amount=BOSS_EXTRUDE6_DEPTH)

    # Sketch16 → Boss-Extrude7 (add)
    with BuildSketch(Plane(origin=(0, 1, 0), x_dir=(1, 0, 0), z_dir=(0, 1, 0))):
        with Locations((2.285714286, 9.4)):
            Rectangle(SKETCH16_W, SKETCH16_H)
        with Locations((-17.564285714, -13.5)):
            Rectangle(SKETCH16_W, SKETCH16_H)
    extrude(amount=BOSS_EXTRUDE7_DEPTH)


solid = part_3.part
